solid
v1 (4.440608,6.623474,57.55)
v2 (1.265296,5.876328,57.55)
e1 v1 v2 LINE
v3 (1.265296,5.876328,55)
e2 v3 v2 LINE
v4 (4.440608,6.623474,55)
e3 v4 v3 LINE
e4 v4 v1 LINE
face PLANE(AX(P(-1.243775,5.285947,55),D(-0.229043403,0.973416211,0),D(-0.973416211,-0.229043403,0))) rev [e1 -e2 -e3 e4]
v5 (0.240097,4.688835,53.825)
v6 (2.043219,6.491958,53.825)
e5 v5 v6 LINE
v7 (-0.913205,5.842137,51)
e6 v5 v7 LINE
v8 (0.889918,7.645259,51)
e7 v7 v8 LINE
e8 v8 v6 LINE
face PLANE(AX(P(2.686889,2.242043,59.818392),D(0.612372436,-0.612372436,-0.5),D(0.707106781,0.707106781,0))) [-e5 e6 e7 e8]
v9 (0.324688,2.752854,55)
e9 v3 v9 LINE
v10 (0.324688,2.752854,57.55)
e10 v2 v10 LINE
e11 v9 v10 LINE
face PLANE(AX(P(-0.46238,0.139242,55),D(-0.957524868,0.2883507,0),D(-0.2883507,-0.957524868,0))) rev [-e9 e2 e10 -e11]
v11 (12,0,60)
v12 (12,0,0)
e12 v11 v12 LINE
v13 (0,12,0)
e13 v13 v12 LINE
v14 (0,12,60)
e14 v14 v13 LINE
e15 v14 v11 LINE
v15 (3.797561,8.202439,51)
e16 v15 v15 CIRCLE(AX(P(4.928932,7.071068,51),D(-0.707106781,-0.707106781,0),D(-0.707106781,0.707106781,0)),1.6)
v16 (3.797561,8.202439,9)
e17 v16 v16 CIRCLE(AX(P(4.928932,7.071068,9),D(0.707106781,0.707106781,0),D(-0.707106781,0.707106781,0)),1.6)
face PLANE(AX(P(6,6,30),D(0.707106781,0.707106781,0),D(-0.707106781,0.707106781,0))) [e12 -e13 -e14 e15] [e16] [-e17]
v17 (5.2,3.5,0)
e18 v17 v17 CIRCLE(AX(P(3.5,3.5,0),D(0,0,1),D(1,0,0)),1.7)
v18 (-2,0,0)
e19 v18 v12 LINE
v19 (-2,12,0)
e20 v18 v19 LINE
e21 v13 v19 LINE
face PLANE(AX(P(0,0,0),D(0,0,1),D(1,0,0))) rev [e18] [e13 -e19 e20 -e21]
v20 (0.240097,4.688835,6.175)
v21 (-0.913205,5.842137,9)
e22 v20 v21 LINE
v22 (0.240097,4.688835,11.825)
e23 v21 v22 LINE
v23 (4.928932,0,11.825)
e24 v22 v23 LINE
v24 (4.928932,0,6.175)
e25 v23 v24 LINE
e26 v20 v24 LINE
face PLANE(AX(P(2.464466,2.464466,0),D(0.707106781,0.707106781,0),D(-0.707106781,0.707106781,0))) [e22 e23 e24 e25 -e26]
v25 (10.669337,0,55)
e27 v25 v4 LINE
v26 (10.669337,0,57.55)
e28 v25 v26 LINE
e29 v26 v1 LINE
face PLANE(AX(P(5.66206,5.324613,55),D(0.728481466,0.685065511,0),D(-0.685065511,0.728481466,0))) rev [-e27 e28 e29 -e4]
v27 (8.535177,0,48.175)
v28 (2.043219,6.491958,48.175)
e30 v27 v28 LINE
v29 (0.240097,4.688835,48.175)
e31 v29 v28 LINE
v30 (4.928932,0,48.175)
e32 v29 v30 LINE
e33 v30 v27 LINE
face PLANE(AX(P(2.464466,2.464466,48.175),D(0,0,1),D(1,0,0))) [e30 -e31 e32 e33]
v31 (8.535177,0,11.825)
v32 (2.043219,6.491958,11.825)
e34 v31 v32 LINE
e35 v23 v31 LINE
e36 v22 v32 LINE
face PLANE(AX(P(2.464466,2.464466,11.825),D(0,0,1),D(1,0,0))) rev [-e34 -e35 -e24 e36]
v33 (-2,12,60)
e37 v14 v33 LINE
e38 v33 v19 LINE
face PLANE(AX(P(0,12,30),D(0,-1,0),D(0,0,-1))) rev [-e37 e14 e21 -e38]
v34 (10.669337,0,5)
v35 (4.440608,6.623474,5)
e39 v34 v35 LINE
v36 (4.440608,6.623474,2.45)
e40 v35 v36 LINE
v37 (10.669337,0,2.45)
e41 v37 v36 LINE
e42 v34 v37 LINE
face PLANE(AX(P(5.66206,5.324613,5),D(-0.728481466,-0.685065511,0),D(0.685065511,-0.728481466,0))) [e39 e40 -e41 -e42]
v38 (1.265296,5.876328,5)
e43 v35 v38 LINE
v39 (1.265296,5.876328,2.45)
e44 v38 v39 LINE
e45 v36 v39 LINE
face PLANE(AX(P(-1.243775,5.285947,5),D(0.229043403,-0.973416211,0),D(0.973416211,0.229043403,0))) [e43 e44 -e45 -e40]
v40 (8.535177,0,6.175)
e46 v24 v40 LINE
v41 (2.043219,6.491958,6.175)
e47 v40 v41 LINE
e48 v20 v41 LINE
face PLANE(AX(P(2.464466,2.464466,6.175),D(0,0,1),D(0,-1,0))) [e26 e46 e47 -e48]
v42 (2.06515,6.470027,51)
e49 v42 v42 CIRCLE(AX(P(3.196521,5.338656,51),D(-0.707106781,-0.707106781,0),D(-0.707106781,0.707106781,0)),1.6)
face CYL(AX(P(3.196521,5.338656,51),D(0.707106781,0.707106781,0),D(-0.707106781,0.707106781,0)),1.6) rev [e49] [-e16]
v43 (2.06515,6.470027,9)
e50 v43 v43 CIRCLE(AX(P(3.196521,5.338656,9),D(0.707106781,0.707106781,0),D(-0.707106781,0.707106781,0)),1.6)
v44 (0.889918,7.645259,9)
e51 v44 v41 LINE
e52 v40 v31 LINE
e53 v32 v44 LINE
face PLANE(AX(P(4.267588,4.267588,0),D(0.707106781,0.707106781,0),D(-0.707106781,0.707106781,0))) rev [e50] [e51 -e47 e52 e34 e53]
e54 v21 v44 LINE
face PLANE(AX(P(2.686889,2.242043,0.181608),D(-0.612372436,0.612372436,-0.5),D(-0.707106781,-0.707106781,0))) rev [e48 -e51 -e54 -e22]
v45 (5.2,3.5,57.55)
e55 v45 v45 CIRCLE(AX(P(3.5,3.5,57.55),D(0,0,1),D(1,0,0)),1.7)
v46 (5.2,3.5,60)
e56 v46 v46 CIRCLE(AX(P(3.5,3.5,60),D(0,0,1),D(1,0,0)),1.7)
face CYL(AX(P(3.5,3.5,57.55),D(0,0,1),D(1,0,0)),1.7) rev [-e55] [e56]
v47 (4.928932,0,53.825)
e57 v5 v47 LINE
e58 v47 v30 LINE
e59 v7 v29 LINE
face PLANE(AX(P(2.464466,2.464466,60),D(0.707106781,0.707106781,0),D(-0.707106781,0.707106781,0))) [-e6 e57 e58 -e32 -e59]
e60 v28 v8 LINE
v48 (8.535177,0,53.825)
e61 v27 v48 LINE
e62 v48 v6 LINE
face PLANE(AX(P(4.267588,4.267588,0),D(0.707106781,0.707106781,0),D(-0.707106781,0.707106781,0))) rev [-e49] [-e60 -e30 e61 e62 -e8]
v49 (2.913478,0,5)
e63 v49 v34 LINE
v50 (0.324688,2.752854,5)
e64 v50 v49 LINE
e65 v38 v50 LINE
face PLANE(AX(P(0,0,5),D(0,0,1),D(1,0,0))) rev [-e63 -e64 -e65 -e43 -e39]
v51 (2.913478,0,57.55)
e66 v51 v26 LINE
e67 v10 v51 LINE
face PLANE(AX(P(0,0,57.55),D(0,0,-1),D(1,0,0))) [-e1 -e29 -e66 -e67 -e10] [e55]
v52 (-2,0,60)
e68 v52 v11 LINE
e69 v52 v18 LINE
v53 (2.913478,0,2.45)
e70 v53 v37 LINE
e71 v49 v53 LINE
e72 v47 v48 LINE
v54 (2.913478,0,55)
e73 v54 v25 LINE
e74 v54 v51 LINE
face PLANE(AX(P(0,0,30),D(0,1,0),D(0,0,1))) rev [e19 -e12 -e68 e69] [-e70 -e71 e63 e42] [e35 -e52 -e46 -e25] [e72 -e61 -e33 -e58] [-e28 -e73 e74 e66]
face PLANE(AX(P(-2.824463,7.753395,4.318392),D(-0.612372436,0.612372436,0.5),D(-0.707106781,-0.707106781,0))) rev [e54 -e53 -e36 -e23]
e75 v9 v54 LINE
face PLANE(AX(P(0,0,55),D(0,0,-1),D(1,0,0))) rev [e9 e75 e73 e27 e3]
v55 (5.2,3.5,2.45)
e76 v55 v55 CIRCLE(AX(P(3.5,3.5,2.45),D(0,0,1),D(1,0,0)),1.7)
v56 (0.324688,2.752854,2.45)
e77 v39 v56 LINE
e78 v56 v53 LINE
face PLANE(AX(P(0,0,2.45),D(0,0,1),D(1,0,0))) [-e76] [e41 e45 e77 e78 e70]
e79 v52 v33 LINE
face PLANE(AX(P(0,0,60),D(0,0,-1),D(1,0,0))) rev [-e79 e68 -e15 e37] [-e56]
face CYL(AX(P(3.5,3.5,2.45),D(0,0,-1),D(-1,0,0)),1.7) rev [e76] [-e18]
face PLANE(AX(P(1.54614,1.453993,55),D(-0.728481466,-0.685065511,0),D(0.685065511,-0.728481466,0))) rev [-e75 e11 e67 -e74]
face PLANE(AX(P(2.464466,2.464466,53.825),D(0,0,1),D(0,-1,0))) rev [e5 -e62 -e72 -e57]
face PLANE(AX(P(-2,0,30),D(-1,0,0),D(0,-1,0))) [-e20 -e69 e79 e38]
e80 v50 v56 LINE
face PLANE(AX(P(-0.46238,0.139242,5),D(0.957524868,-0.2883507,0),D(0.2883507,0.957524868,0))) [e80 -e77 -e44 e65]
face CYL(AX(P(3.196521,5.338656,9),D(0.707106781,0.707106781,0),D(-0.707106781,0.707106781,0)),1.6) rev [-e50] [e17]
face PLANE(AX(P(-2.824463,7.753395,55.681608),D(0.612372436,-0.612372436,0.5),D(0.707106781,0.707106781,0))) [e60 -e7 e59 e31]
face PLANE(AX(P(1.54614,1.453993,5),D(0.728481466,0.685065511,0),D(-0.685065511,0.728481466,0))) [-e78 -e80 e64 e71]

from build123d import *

# Parameters (mm, degrees)
BOSS_EXTRUDE1_DEPTH     = 30
SKETCH1_13_W            = 2
SKETCH1_13_H            = 12
BOSS_EXTRUDE6_DEPTH     = 30
CUT_EXTRUDE3_DEPTH      = 5
BOSS_EXTRUDE4_START     = -2.45
BOSS_EXTRUDE4_OUTLINE_W = 30
BOSS_EXTRUDE4_OUTLINE_H = 14.485281374
BOSS_EXTRUDE4_OUTLINE_R = 1.6
BOSS_EXTRUDE4_DEPTH     = 2.45
CUT_EXTRUDE1_DEPTH      = 5
SKETCH1_10_R            = 1.7
BOSS_EXTRUDE5_DEPTH     = 2.45
CUT_EXTRUDE4_DEPTH      = 63.353829072


# Read off the part's stored shape, not the designer's step: Boss-Extrude4
with BuildPart() as part:
    # Sketch1 → Boss-Extrude1 (new body)
    with BuildSketch(Plane.XY):
        Polygon((0, 12), (12, 0), (0, 0), align=None)
    boss_extrude1 = extrude(amount=BOSS_EXTRUDE1_DEPTH)

    # Sketch1<13> → Boss-Extrude6 (add)
    with BuildSketch(Plane.XY):
        with Locations((-1, 6)):
            Rectangle(SKETCH1_13_W, SKETCH1_13_H)
    boss_extrude6 = extrude(amount=BOSS_EXTRUDE6_DEPTH)

    # Sketch4 → Cut-Extrude3 (cut)
    with BuildSketch(Plane(origin=(6, 6, 0), x_dir=(0, 0, -1), z_dir=(0.7071067811865477, 0.7071067811865475, 0))):
        Polygon((-6.175, -8.485281374), (-6.175, 3.145733136), (-9, 4.776747647), (-11.825, 3.145733136), (-11.825, -8.485281374), align=None)
    cut_extrude3 = extrude(amount=-CUT_EXTRUDE3_DEPTH, mode=Mode.SUBTRACT)

    # Boss-Extrude4 outline → Boss-Extrude4 (add)
    with BuildSketch(Plane(origin=(6, 6, 0), x_dir=(0, 0, -1), z_dir=(0.7071067811865477, 0.7071067811865475, 0)).offset(BOSS_EXTRUDE4_START)):
        with Locations((-15, -1.242640687)):
            Rectangle(BOSS_EXTRUDE4_OUTLINE_W, BOSS_EXTRUDE4_OUTLINE_H)
        with Locations((-9, 1.514718626)):
            Circle(BOSS_EXTRUDE4_OUTLINE_R, mode=Mode.SUBTRACT)
    boss_extrude4 = extrude(amount=BOSS_EXTRUDE4_DEPTH)

    # Sketch1<4> → Cut-Extrude1 (cut)
    with BuildSketch(Plane.XY):
        Polygon((10.669337222, 0), (4.440608352, 6.623473909), (1.265296423, 5.876327682), (0.324688071, 2.752853773), (2.91347758, 0), align=None)
    cut_extrude1 = extrude(amount=CUT_EXTRUDE1_DEPTH, mode=Mode.SUBTRACT)

    # Sketch1<10> → Boss-Extrude5 (add)
    # profile 1 of 2: a face of its own
    with BuildSketch(Plane.XY):
        Polygon((2.559391648, 0.376526091), (5.734703577, 1.123672318), (6.675311929, 4.247146227), (4.440608352, 6.623473909), (1.265296423, 5.876327682), (0.324688071, 2.752853773), align=None)
        with Locations((3.5, 3.5)):
            Circle(SKETCH1_10_R, mode=Mode.SUBTRACT)
    # profile 2 of 2: a face of its own
    with BuildSketch(Plane.XY):
        Polygon((3.5, 0), (10.669337222, 0), (6.675311929, 4.247146227), (5.734703577, 1.123672318), (2.559391648, 0.376526091), (2.91347758, 0), align=None)
    boss_extrude5 = extrude(amount=BOSS_EXTRUDE5_DEPTH)

    # Mirror1: Boss-Extrude1, Boss-Extrude6, Cut-Extrude3, Boss-Extrude4, Cut-Extrude1, Boss-Extrude5 across plane
    add(boss_extrude1.mirror(Plane.XY.offset(30)))
    add(boss_extrude6.mirror(Plane.XY.offset(30)))
    add(cut_extrude3.mirror(Plane.XY.offset(30)), mode=Mode.SUBTRACT)
    add(boss_extrude4.mirror(Plane.XY.offset(30)))
    add(cut_extrude1.mirror(Plane.XY.offset(30)), mode=Mode.SUBTRACT)
    add(boss_extrude5.mirror(Plane.XY.offset(30)))

    # Sketch1<12> → Cut-Extrude4 (cut, through all)
    with BuildSketch(Plane.XY):
        Polygon((12, -3.5), (12, 0), (10.669337222, 0), (3.5, 0), (2.91347758, 0), (1.441458618, 0), (0, 0), (0, -3.5), align=None)
    extrude(amount=CUT_EXTRUDE4_DEPTH, mode=Mode.SUBTRACT)


solid = part.part
